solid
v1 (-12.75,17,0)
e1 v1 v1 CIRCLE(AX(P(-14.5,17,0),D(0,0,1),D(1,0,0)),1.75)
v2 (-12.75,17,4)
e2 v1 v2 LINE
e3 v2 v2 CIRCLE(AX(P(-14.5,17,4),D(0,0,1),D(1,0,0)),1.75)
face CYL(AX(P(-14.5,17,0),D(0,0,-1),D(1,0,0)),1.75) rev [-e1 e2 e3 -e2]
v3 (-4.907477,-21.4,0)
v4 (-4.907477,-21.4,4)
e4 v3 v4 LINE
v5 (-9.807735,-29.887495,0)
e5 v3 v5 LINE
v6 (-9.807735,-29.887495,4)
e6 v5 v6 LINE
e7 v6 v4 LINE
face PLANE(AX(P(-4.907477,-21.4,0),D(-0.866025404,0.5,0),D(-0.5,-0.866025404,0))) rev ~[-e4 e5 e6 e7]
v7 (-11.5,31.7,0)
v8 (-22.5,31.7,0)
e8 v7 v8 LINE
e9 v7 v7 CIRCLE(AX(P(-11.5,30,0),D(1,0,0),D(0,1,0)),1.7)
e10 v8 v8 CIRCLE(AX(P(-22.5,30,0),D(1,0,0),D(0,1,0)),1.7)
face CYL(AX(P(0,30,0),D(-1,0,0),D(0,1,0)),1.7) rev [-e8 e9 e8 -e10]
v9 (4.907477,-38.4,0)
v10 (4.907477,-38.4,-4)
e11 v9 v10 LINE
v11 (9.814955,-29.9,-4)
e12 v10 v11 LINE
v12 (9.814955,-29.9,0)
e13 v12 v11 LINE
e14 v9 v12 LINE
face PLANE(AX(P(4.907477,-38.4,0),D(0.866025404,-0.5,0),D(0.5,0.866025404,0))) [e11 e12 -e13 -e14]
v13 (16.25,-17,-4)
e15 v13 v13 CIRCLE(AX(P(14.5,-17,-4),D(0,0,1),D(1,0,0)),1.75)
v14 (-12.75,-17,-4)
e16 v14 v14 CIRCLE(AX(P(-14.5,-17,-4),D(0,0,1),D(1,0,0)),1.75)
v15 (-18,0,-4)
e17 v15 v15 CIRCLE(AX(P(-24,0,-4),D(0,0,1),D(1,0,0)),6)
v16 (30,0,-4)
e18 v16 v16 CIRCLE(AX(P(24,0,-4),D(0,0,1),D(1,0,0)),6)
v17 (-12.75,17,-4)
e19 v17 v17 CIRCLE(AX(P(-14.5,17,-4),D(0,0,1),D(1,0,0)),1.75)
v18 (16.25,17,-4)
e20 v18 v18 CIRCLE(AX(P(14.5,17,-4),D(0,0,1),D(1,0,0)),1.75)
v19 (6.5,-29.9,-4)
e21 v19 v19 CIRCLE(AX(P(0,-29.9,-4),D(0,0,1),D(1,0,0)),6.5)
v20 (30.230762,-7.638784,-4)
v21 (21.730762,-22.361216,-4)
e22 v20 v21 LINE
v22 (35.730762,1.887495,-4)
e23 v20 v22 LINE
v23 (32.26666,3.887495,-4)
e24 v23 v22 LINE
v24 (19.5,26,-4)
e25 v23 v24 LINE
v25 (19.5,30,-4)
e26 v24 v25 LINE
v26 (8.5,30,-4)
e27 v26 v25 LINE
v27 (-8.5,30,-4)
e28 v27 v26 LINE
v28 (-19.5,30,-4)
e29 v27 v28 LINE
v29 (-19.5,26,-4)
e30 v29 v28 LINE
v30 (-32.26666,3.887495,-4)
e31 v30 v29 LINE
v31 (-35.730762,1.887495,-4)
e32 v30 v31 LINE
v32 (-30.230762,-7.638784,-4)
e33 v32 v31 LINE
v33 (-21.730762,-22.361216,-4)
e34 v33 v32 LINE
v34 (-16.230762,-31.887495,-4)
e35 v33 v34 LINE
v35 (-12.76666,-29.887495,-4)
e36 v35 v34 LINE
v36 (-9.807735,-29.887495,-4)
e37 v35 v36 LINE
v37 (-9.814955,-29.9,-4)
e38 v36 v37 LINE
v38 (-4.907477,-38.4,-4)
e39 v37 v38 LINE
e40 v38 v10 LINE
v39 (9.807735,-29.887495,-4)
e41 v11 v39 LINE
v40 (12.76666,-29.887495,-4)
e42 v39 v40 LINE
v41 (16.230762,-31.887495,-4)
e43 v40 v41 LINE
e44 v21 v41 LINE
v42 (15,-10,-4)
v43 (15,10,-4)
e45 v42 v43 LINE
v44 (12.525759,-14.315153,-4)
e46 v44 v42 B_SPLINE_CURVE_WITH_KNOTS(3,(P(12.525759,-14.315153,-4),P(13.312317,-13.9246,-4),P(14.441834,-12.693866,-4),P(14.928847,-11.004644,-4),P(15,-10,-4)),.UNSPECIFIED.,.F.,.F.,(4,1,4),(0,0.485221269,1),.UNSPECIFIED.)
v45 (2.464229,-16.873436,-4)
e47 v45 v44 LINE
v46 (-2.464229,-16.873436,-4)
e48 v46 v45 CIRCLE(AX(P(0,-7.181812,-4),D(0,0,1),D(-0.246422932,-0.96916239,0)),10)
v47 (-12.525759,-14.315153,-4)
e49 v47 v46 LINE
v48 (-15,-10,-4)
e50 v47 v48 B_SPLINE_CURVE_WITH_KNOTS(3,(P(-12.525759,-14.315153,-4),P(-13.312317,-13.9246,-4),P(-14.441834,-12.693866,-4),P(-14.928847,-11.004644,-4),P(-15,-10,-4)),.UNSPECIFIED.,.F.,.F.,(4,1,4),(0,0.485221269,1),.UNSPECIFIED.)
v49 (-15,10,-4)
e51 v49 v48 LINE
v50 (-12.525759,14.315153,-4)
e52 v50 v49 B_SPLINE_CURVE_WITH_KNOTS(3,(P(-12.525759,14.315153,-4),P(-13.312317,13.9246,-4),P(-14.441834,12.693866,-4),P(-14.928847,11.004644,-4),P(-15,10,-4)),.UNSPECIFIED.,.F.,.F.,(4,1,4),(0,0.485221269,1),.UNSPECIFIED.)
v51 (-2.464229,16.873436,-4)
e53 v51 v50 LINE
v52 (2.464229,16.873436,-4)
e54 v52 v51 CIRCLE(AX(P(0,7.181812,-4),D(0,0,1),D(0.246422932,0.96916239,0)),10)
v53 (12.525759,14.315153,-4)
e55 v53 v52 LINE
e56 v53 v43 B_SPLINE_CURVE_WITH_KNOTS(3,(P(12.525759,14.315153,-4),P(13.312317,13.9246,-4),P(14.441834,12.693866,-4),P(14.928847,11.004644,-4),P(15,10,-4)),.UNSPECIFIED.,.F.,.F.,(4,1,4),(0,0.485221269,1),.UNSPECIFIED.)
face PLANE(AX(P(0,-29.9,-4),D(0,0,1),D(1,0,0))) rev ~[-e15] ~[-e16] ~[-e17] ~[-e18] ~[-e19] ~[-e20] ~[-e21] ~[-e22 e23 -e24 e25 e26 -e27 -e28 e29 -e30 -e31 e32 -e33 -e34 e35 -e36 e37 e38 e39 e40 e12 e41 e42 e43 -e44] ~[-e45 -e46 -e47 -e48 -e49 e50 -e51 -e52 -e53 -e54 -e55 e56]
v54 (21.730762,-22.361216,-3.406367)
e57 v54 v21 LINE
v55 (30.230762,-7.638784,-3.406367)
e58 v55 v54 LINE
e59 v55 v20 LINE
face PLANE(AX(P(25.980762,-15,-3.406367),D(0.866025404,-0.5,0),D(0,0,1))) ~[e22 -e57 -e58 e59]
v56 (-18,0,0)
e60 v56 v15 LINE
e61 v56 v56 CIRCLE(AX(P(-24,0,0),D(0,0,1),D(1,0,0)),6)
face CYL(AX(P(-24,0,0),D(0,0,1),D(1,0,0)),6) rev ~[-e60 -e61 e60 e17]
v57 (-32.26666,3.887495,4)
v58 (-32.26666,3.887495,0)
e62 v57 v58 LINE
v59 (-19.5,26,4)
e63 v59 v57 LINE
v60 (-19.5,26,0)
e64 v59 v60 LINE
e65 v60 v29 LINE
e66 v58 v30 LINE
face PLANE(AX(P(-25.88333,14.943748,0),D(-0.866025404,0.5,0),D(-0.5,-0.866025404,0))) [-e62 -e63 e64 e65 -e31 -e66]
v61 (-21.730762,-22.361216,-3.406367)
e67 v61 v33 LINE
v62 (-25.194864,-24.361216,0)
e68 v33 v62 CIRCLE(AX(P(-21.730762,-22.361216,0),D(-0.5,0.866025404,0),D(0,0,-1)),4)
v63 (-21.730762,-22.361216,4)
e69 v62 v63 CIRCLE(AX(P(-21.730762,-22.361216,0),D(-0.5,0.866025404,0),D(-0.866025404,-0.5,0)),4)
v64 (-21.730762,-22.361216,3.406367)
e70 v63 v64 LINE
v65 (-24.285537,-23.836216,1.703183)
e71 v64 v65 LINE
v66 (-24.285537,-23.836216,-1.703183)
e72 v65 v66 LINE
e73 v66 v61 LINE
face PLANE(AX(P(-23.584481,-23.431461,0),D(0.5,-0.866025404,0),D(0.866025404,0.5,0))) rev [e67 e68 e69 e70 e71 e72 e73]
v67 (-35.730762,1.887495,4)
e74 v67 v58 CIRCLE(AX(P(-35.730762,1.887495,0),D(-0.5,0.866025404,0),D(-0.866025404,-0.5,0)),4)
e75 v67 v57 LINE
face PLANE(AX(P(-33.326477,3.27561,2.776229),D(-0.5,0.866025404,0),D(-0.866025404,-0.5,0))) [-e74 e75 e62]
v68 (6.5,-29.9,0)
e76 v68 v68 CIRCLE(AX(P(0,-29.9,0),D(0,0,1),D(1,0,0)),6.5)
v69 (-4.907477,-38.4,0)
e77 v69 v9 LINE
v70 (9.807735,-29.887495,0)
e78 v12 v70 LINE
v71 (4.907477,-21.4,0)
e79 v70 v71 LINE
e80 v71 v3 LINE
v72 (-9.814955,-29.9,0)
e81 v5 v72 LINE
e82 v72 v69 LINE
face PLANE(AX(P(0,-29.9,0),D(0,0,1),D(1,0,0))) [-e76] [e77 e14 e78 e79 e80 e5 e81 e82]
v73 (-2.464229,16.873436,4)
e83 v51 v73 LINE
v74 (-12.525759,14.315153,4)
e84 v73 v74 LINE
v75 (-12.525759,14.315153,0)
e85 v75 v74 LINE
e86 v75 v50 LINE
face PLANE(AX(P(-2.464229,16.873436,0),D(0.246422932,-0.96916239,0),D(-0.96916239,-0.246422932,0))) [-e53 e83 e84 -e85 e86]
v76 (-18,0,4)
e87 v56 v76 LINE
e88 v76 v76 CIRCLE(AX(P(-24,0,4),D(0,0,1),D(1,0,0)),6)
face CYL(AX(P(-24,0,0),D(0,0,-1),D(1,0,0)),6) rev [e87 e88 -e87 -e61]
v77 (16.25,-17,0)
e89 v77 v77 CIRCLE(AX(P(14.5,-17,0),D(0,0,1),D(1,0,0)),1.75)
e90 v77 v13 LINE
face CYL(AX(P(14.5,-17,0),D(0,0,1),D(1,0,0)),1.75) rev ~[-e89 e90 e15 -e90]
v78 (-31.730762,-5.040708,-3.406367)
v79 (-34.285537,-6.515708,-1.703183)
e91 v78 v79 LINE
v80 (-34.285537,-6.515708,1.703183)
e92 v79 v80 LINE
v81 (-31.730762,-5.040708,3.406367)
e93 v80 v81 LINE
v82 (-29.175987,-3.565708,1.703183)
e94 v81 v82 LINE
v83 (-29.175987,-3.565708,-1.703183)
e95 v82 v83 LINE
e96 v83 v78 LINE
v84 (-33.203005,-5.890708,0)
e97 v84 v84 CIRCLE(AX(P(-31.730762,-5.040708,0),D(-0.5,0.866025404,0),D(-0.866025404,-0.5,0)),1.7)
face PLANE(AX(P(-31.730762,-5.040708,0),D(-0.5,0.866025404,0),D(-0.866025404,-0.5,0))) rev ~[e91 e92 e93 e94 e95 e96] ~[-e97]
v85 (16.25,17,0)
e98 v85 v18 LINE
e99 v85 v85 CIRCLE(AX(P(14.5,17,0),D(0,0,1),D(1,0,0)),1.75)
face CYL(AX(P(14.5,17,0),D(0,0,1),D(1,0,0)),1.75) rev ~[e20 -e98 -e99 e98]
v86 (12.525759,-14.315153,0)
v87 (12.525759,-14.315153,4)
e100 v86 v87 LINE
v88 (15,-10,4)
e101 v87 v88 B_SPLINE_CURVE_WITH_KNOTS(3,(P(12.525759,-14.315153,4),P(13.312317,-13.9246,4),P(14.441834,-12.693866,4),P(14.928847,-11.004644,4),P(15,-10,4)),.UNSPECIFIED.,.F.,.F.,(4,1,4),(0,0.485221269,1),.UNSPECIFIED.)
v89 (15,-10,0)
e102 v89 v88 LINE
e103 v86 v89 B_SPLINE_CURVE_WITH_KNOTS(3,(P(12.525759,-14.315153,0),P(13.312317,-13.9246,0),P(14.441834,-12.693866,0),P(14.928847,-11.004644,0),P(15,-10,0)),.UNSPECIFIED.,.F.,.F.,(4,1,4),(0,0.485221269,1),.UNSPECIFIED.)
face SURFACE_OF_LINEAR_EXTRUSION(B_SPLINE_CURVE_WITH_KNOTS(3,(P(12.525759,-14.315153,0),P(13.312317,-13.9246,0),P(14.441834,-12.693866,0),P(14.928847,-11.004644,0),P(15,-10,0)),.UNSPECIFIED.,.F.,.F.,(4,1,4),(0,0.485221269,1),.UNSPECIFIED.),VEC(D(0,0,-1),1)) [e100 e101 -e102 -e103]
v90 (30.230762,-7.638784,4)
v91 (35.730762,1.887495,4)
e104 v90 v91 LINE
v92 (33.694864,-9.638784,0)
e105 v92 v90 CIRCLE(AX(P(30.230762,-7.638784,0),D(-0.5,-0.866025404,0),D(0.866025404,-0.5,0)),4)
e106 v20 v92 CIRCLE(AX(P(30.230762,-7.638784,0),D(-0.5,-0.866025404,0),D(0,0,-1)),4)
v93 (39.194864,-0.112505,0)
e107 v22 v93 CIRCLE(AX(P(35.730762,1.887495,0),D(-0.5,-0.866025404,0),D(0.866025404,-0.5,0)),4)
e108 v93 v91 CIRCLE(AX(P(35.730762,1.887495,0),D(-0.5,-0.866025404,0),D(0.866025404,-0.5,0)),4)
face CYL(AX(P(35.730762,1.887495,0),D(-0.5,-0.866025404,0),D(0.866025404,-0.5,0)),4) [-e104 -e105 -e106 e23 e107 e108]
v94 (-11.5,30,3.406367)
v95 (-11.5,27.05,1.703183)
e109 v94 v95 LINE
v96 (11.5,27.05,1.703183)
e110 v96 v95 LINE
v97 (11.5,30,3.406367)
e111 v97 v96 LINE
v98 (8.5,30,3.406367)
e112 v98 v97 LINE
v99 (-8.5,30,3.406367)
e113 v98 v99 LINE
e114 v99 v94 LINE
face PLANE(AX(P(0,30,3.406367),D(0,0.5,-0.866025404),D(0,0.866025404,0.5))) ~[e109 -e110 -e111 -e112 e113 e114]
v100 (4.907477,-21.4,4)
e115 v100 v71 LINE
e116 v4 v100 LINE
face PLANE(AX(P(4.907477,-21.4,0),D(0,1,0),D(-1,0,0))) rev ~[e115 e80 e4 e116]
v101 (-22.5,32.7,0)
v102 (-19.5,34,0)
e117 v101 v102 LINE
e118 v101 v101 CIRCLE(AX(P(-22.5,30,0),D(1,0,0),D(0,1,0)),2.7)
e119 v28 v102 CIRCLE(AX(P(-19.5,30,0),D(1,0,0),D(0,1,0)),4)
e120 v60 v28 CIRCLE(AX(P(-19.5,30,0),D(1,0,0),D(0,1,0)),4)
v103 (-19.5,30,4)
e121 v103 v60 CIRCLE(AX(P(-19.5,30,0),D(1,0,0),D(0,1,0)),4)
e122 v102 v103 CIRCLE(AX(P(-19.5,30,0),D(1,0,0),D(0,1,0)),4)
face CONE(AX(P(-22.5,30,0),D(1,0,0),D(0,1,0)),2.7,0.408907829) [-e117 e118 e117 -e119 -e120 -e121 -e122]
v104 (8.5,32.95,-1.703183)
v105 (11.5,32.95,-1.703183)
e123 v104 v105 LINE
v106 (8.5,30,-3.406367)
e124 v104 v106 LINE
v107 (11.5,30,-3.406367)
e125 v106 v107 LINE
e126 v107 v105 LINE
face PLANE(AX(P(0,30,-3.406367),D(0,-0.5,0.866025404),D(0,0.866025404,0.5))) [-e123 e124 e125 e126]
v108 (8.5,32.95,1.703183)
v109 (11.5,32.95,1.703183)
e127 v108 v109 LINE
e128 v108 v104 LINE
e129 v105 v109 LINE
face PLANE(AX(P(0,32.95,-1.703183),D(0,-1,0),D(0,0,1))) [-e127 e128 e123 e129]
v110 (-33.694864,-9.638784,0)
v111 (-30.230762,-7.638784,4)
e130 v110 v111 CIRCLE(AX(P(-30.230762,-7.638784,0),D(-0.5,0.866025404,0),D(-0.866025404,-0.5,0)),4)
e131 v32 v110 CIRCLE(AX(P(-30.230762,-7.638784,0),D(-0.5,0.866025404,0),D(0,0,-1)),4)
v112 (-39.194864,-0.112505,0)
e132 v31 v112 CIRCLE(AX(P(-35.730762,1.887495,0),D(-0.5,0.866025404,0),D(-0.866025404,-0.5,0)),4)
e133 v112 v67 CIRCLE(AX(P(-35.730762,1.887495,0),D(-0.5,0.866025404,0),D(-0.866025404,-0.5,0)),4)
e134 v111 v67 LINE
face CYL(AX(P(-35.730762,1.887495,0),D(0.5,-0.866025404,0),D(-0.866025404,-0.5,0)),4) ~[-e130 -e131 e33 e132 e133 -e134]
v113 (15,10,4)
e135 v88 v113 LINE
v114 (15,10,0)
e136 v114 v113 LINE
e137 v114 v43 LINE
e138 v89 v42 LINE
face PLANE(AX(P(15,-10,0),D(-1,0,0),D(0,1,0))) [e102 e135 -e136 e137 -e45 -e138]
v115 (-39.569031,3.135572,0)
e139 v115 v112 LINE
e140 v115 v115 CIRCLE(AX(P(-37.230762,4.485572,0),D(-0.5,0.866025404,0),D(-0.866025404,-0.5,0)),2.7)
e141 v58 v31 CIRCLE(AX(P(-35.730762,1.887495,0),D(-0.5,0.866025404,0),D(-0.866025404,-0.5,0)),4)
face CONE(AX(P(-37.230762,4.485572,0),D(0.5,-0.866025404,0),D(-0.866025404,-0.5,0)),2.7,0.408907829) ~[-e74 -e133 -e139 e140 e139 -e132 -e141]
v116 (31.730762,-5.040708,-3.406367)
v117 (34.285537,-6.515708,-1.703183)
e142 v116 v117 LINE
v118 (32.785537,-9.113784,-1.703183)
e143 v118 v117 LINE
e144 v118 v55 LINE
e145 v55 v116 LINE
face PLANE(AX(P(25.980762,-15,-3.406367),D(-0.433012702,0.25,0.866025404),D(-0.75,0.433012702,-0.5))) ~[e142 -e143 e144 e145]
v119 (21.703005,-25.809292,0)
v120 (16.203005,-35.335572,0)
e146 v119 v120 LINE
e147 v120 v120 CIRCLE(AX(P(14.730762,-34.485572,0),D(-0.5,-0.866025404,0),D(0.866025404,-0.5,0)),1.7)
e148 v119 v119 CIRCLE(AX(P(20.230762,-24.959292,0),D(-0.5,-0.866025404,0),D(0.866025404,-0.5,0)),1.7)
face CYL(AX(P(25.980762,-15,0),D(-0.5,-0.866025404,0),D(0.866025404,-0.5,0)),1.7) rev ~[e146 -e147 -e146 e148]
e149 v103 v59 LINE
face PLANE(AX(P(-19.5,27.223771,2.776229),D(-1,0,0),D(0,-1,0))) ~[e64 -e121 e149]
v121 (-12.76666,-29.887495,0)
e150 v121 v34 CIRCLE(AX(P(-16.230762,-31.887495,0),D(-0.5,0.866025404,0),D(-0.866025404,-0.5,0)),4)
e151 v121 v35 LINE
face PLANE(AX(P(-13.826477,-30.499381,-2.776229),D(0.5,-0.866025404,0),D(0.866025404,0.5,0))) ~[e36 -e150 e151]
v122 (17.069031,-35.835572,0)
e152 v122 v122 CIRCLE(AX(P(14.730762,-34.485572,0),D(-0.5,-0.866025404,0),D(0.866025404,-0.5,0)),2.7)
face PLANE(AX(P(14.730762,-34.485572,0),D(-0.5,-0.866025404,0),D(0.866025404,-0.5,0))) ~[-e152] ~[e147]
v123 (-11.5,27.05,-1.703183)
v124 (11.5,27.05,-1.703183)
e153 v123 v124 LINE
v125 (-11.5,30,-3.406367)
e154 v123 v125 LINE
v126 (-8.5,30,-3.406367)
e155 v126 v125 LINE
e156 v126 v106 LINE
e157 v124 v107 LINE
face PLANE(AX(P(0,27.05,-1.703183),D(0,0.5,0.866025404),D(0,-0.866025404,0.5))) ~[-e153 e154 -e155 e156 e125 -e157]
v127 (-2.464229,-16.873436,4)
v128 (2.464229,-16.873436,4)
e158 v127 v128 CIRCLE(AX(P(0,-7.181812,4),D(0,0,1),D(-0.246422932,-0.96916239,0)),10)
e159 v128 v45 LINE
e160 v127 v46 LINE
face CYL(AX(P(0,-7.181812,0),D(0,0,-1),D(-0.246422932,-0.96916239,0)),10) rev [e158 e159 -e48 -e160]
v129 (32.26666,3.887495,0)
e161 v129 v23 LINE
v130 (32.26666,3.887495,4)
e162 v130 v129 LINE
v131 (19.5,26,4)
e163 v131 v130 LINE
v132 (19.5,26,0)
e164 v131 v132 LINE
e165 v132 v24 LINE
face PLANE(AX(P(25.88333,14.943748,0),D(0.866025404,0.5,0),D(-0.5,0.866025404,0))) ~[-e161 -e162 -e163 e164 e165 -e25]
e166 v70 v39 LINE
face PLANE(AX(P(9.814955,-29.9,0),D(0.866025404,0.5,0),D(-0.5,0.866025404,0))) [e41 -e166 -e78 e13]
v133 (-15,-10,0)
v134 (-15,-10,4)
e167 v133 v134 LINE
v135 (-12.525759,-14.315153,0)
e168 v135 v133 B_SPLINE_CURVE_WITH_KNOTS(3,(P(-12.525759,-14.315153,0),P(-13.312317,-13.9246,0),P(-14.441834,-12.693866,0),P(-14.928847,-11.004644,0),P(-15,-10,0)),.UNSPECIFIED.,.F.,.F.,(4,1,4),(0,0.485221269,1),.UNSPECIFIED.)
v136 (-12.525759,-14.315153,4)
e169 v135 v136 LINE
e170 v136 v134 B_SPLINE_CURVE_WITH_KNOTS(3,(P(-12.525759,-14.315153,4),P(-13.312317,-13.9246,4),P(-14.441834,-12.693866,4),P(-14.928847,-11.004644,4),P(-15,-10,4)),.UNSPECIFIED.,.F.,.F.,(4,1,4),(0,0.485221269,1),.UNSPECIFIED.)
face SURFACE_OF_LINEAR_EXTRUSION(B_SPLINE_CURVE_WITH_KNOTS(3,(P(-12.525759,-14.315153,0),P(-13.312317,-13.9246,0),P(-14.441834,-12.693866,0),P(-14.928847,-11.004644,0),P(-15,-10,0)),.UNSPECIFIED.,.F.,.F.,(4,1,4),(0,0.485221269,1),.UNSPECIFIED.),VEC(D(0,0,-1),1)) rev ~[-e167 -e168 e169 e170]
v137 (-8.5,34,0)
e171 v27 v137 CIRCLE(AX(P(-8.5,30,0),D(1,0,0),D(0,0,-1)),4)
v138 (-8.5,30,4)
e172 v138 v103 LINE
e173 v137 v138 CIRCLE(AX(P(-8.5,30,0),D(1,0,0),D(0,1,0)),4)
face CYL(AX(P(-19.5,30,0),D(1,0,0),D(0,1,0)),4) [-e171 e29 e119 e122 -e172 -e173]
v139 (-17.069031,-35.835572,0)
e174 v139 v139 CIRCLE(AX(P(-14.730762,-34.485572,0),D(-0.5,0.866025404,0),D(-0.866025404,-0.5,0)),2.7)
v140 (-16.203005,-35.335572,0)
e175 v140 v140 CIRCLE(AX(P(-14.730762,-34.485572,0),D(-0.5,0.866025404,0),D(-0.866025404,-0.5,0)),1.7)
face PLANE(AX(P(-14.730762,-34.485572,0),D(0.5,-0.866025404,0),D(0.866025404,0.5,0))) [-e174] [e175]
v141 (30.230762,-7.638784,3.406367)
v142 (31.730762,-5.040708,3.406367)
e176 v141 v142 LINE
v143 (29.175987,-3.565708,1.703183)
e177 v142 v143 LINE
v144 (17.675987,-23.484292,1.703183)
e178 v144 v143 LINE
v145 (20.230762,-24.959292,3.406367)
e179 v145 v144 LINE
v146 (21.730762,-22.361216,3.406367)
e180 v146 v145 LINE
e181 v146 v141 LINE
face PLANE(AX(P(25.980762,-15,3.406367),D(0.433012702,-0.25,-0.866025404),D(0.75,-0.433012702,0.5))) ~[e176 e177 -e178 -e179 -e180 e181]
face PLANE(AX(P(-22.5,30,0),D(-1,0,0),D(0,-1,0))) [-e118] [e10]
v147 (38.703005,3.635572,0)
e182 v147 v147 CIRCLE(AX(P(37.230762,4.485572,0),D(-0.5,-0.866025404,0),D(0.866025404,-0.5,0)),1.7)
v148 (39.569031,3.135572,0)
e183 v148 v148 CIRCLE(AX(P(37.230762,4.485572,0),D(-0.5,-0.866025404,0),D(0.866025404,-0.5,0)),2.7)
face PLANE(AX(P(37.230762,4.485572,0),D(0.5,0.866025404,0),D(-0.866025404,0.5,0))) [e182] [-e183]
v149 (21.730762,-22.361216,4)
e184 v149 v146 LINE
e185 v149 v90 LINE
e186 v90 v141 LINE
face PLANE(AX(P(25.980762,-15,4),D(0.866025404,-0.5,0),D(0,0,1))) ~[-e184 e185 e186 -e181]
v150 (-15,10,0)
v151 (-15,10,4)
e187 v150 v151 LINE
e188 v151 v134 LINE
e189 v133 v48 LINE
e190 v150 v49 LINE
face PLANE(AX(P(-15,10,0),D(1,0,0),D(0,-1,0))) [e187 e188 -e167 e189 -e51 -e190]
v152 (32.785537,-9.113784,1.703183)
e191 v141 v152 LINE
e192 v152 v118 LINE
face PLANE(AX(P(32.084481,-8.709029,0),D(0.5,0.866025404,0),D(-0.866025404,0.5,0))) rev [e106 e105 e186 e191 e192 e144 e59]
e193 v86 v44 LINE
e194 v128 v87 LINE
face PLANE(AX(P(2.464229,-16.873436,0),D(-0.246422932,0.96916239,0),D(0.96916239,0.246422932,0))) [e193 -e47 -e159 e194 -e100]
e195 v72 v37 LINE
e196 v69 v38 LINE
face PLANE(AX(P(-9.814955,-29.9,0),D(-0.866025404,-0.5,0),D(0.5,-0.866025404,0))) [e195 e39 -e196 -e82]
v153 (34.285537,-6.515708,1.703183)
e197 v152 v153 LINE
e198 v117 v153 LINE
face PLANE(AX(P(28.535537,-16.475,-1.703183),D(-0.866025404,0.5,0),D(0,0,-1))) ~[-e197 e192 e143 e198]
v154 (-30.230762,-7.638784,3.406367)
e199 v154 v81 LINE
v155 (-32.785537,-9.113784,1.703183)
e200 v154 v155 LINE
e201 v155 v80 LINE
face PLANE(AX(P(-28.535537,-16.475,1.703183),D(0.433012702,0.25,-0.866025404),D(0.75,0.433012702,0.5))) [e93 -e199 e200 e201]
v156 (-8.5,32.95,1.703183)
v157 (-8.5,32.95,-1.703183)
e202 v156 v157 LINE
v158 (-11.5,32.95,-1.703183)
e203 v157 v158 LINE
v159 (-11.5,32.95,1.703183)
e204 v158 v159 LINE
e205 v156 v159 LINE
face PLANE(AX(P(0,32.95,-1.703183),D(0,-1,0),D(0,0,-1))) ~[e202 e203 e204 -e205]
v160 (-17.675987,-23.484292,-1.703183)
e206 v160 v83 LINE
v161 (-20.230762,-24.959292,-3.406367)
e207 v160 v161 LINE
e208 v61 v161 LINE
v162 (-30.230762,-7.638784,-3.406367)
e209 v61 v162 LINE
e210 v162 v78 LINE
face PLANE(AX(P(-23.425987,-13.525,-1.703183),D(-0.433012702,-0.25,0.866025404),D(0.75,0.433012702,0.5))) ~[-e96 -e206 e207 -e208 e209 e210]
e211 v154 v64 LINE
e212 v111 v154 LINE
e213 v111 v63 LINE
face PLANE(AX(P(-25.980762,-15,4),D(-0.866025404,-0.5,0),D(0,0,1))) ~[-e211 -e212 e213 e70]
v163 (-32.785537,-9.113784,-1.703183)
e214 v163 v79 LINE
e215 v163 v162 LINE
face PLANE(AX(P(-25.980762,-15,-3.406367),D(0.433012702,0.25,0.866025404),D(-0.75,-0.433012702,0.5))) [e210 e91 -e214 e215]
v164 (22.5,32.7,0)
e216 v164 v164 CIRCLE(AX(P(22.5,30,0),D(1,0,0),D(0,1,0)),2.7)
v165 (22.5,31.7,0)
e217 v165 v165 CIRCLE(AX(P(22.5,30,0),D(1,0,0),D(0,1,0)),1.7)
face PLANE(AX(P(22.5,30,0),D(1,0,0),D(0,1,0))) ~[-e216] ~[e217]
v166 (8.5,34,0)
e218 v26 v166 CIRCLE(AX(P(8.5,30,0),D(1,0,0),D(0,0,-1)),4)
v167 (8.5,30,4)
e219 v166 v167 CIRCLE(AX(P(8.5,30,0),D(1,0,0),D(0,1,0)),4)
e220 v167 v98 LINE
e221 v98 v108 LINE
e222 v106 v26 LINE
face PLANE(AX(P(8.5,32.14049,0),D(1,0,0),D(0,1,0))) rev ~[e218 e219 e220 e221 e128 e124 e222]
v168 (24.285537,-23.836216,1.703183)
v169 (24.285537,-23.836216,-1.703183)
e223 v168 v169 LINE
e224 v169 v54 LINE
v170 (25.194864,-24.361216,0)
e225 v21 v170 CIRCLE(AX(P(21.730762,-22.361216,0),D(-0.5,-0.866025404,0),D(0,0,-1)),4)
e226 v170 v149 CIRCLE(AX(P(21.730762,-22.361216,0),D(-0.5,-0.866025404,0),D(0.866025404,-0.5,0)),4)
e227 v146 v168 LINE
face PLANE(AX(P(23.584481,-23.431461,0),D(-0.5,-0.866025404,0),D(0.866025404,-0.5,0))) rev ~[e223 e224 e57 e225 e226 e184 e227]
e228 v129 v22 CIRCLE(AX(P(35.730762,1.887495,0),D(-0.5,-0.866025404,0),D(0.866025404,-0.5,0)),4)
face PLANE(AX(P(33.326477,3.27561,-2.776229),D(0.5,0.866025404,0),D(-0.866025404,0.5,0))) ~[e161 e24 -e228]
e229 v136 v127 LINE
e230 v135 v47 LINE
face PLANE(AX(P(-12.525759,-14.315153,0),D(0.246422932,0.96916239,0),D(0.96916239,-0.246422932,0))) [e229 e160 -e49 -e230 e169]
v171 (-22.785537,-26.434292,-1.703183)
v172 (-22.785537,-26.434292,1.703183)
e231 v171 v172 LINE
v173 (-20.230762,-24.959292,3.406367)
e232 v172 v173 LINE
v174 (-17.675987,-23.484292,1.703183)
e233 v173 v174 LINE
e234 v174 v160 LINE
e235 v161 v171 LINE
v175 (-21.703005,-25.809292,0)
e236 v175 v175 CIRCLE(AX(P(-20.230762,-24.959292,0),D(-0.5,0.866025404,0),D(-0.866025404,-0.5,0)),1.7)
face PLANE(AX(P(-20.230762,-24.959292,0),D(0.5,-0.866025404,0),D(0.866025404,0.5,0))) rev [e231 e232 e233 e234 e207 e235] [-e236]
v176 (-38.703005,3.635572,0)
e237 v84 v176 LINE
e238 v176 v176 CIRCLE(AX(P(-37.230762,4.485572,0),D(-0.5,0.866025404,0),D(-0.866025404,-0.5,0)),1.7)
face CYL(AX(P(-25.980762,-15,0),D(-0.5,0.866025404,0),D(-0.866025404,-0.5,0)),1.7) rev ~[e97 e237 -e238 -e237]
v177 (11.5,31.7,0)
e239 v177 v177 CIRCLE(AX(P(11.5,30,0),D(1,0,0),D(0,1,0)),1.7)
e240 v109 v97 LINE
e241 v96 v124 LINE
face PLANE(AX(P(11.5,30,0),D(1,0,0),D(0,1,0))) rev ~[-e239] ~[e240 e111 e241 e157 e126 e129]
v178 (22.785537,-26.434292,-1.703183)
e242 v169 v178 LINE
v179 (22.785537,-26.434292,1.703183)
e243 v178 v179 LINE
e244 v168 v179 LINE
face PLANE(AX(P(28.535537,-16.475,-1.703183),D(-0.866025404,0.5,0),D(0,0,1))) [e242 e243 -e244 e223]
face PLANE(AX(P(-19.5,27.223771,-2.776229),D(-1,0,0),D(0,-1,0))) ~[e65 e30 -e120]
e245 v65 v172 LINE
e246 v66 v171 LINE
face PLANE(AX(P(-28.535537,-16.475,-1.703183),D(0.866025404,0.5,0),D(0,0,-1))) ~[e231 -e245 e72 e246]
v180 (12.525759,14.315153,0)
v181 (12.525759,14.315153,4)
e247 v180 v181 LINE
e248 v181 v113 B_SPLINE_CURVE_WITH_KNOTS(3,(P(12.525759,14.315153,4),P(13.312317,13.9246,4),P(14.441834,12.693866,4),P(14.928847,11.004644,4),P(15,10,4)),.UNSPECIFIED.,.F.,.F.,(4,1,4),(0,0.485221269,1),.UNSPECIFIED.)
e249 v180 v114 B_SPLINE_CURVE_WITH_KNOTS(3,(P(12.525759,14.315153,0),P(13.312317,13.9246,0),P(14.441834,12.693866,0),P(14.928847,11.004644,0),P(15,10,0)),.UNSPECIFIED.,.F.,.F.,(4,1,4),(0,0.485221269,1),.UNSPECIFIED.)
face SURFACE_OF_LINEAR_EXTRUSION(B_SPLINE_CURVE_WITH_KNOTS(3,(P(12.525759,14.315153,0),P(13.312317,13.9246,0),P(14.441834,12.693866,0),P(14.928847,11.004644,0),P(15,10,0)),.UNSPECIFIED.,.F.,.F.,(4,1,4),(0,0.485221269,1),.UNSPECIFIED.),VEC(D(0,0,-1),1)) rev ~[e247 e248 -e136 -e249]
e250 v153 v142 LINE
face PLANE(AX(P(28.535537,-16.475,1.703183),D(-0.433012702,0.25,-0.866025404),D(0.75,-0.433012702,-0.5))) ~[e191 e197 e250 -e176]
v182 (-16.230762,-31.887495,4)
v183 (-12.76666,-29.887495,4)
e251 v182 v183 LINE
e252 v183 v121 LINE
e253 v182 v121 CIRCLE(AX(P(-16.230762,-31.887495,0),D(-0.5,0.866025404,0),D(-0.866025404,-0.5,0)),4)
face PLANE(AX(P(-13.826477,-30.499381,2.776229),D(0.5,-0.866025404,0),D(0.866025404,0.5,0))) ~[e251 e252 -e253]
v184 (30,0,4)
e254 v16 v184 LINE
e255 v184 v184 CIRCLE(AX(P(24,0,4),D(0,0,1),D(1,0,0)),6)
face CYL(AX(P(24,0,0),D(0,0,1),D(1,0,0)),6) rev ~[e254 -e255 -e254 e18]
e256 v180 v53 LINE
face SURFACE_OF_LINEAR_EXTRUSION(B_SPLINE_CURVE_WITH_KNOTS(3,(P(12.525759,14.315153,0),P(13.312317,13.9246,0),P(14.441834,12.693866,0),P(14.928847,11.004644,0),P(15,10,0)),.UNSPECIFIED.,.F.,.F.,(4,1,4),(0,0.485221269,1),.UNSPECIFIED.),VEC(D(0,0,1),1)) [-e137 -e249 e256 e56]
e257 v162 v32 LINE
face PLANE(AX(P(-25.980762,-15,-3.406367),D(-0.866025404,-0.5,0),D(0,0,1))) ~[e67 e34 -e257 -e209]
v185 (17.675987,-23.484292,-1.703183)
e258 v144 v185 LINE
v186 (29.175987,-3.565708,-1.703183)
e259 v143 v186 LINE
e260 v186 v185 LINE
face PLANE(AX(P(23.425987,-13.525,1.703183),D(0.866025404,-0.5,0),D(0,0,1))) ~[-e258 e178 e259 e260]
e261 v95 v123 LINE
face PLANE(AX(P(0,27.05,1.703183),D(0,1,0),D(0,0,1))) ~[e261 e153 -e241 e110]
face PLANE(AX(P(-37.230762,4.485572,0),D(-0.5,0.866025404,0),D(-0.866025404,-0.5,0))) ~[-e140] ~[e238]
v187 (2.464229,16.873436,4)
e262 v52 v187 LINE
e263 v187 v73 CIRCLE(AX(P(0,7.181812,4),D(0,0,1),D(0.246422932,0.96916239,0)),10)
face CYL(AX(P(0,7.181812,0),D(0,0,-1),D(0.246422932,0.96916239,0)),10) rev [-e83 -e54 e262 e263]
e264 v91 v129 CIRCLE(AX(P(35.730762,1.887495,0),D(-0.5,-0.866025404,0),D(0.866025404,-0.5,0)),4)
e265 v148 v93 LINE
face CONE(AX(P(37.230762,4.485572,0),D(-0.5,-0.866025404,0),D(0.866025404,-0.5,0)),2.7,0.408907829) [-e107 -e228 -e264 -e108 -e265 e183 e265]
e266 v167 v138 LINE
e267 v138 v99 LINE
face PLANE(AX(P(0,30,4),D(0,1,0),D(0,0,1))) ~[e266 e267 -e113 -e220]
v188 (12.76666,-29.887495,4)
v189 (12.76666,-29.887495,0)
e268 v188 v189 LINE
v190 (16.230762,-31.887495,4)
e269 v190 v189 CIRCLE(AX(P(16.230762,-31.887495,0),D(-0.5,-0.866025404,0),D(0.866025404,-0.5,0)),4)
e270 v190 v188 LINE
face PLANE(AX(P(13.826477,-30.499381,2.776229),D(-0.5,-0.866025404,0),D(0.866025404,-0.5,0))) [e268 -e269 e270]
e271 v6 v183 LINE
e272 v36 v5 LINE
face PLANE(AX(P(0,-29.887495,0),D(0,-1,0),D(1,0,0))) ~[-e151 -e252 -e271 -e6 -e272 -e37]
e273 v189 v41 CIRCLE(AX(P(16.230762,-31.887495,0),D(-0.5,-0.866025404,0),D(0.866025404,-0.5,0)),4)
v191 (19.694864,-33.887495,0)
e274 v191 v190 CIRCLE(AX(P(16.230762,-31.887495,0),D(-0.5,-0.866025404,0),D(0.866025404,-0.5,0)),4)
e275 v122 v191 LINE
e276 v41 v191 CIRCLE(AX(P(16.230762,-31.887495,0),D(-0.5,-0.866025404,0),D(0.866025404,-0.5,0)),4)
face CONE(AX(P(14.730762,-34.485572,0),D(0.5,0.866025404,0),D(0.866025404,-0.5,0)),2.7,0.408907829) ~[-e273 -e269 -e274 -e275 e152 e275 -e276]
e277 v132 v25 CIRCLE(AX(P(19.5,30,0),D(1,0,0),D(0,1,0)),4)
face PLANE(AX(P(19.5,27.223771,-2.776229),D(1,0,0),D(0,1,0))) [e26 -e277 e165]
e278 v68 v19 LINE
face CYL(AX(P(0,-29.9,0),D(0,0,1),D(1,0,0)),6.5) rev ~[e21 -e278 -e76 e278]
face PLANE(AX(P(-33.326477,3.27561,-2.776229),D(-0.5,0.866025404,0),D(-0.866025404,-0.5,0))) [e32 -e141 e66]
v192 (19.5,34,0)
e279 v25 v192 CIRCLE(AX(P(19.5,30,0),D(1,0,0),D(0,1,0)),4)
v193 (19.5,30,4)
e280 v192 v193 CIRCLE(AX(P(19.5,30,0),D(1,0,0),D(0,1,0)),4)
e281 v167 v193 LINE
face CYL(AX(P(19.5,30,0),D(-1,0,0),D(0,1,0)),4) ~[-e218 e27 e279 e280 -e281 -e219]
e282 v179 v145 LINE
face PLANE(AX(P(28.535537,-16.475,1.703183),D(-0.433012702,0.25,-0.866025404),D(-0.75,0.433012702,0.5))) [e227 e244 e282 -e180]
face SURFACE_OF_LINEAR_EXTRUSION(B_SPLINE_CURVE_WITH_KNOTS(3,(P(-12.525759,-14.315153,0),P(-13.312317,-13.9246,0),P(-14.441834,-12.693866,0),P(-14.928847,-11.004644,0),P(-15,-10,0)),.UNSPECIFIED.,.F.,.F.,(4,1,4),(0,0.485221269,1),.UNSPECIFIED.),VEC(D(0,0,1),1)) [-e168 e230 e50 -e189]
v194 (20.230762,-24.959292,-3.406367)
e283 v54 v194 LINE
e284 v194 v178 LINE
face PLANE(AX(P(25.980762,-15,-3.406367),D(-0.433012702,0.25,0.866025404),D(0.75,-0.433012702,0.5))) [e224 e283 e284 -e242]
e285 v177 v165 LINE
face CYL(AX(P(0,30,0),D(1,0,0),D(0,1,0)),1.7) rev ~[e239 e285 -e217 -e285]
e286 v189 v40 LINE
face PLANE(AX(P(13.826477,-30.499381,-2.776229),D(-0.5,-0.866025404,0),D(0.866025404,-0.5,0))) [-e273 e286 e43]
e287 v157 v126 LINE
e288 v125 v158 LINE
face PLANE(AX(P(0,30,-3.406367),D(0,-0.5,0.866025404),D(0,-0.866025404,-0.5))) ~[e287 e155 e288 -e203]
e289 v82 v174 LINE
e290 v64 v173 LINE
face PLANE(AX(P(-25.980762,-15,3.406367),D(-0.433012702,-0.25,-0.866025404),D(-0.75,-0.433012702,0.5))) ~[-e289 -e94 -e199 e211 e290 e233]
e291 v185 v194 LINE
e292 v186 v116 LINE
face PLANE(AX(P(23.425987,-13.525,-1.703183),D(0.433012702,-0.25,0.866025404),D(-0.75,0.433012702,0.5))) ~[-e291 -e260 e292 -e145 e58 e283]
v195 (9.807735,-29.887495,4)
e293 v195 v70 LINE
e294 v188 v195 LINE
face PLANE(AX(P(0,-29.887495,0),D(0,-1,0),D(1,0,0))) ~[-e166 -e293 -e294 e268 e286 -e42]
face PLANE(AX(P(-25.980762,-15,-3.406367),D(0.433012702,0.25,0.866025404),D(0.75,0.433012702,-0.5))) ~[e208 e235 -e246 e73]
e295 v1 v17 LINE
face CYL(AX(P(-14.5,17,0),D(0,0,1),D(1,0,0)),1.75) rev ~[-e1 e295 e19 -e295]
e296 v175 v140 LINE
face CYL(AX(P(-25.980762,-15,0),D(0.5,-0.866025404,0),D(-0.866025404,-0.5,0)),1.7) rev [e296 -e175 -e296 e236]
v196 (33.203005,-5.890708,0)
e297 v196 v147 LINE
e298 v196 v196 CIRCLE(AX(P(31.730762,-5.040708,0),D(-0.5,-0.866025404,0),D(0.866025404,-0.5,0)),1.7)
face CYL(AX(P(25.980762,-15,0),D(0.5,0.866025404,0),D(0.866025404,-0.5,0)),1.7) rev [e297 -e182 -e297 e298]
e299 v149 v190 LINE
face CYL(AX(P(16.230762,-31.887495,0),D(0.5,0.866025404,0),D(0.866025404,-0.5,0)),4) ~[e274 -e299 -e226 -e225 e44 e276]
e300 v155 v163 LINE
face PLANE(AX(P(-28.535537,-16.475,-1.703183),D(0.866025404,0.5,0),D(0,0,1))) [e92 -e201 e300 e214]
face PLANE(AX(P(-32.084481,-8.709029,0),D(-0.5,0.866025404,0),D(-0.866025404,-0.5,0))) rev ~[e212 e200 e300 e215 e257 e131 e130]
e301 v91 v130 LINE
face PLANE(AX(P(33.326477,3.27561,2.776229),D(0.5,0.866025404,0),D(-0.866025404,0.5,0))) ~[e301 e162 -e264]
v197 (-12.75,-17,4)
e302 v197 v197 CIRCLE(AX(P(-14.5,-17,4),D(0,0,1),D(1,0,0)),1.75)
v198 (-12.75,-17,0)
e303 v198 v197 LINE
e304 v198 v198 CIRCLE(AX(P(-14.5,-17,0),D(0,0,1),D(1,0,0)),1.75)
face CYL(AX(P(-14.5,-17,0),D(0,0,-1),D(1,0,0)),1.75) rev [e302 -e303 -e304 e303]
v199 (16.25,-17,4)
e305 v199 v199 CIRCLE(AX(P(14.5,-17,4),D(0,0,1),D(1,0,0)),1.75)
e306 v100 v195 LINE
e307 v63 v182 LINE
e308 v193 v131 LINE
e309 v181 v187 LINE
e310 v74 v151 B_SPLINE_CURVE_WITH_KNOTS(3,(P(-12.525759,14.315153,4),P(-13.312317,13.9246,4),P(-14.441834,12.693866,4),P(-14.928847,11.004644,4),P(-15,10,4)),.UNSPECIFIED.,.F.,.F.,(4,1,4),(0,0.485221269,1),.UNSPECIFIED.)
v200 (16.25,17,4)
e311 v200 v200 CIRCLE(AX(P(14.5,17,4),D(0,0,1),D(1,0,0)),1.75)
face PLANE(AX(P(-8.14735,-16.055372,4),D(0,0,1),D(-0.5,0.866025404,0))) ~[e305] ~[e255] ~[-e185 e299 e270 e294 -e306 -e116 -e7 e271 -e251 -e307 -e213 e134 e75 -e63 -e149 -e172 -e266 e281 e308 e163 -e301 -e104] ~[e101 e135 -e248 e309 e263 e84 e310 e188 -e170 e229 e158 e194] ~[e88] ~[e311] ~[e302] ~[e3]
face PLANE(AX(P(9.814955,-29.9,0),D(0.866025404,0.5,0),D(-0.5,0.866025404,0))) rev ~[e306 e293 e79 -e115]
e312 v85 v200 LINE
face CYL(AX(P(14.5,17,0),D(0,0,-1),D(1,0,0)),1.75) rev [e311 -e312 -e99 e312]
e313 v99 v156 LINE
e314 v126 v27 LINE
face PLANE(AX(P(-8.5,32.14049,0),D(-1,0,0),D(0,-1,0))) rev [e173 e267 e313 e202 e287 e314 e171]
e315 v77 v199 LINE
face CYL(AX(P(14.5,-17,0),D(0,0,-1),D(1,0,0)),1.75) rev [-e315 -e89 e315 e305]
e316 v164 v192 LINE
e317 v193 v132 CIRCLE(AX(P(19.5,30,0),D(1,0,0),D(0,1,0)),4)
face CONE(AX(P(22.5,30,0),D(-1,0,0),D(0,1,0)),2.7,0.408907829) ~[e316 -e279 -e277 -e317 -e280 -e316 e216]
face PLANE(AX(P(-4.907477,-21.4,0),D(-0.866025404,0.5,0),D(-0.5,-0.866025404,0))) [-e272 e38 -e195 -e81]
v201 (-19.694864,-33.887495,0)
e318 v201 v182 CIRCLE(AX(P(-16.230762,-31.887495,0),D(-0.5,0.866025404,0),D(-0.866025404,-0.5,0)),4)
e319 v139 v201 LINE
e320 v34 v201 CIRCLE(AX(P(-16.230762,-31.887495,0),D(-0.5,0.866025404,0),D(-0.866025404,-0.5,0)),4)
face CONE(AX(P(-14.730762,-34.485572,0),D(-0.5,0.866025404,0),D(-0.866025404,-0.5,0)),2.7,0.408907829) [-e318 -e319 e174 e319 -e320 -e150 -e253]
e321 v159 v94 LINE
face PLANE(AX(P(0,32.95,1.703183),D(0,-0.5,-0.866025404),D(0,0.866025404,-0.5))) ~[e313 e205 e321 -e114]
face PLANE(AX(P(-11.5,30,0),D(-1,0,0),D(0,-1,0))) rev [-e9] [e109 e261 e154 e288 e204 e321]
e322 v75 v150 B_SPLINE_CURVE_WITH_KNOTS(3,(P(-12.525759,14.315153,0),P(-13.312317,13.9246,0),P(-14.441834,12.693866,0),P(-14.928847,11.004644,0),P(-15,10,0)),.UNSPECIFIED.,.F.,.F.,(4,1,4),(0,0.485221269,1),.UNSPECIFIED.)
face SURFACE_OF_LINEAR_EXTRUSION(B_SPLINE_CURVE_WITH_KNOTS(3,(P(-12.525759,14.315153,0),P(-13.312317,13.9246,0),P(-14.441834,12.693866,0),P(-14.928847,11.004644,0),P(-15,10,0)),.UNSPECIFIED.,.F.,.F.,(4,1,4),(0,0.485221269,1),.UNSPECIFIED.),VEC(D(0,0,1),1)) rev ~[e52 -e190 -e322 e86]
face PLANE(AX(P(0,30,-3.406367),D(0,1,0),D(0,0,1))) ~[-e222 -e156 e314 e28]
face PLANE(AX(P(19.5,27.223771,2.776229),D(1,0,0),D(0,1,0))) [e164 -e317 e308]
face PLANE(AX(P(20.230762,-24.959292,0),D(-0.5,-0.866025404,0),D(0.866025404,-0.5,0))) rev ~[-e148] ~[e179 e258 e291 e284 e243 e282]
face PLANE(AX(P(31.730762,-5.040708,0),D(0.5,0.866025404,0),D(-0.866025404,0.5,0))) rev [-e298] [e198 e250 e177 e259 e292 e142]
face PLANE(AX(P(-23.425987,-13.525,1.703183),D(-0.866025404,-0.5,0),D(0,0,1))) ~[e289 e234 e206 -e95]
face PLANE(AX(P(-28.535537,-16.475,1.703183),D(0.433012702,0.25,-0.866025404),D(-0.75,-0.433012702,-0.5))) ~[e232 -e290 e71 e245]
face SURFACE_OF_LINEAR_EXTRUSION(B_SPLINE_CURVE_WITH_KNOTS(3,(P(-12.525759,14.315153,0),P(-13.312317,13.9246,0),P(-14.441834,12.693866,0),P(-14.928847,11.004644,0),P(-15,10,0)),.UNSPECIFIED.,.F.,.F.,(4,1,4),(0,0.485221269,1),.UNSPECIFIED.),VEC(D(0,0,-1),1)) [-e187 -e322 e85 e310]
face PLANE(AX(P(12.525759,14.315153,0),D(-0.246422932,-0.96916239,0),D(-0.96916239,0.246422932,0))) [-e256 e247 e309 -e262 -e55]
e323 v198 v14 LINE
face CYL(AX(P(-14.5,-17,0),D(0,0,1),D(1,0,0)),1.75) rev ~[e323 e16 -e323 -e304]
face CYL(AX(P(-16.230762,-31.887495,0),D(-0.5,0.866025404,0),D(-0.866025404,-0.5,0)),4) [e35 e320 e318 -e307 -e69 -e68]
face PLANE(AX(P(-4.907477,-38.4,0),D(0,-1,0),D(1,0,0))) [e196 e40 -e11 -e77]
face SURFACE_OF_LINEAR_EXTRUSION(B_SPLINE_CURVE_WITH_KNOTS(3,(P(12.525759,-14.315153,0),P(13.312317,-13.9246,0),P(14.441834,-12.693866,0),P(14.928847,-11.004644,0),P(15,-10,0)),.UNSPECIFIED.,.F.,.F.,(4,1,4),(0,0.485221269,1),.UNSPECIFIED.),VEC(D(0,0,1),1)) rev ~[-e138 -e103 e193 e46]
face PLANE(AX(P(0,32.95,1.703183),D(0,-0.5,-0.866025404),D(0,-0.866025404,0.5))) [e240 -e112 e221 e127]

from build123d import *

# Parameters (mm, degrees)
F4_DEPTH  = 19.5
F5_DEPTH  = 4
F6_DEPTH  = 11.5
F7_DEPTH  = 8.5
F9_COUNT  = 3
F9_ANGLE  = 240
F2_R      = 1.75
F2_R_2    = 6
F10_DEPTH = 4
F11_R     = 6.5
F12_DEPTH = 20
F13_DEPTH = 4


# Not quite as in the source:
# - a feature of the source that left no trace in its solid (it failed there, or was rolled back) is left out
# - a feature names something its author has since deleted; it is built from what else it names


with BuildPart() as f3:
    # F0 (on Top) → F3 (revolve)
    with BuildSketch(Plane.XY):
        Polygon((19.5, 34), (0, 34), (0, 31.7), (22.5, 31.7), (22.5, 32.7), align=None)
    revolve(axis=Axis((11.25, 30, 0), (1, 0, 0)))

    # F1 (on Right) → F4 (join)
    with BuildSketch(Plane.YZ):
        with BuildLine():
            Line((26, 4), (26, 0))
            ThreePointArc((26, 0), (27.1715728753, 2.8284271247), (30, 4))
            Line((30, 4), (26, 4))
        make_face()
        with BuildLine():
            Line((26, -4), (30, -4))
            ThreePointArc((30, -4), (27.1715728753, -2.8284271247), (26, 0))
            Line((26, 0), (26, -4))
        make_face()
    extrude(amount=F4_DEPTH)

    # F0 (on Top) → F5 (join, symmetric)
    with BuildSketch(Plane.XY):
        Polygon((19.5, 26), (0, 26), (0, 0), (25.8833302492, 14.9437476869), align=None)
    extrude(amount=F5_DEPTH, both=True)

    # F1 (on Right) → F6 (cut)
    with BuildSketch(Plane.YZ):
        Polygon((30, -3.4063665882), (32.95, -1.7031832941), (32.95, 1.7031832941), (30, 3.4063665882), (27.05, 1.7031832941), (27.05, -1.7031832941), align=None)
    extrude(amount=F6_DEPTH, mode=Mode.SUBTRACT)

    # F1 (on Right) → F7 (cut)
    with BuildSketch(Plane.YZ):
        with BuildLine():
            Line((32.95, 1.7031832941), (32.95, -1.7031832941))
            Line((32.95, -1.7031832941), (30, -3.4063665882))
            Line((30, -3.4063665882), (30, -4))
            ThreePointArc((30, -4), (32.8284271247, -2.8284271247), (34, 0))
            ThreePointArc((34, 0), (32.8284271247, 2.8284271247), (30, 4))
            Line((30, 4), (30, 3.4063665882))
            Line((30, 3.4063665882), (32.95, 1.7031832941))
        make_face()
    extrude(amount=F7_DEPTH, mode=Mode.SUBTRACT)

    # F8: F3 across plane


with BuildPart() as f3_1:
    add(f3.part)
    add(f3.part.mirror(Plane.YZ))

    # F9: F3 ×3 about axis
    f9_axis = Axis((0, 0, 0), (0, 0, -1))


with BuildPart() as f3_2:
    add(f3_1.part)
    for i in range(1, F9_COUNT):
        add(f3_1.part.rotate(f9_axis, i * F9_ANGLE / (F9_COUNT - 1)))

    # F2 (on Top) → F10 (cut, symmetric)
    with BuildSketch(Plane.XY):
        with Locations((14.5, 17)):
            Circle(F2_R)
        with BuildLine():
            add(Edge.make_bspline(
                [(12.5257586532, 14.3151527465), (13.3123168346, 13.9246002449), (14.4418337404, 12.6938657), (14.9288469383, 11.0046443666), (15, 10)],
                knots=[0, 0, 0, 0, 0.4852212686, 1, 1, 1, 1], degree=3))
            Line((12.5257586532, 14.3151527465), (2.4642293228, 16.8734356371))
            ThreePointArc((2.4642293228, 16.8734356371), (0, 17.1818117358), (-2.4642293228, 16.8734356371))
            Line((-2.4642293228, 16.8734356371), (-12.5257586532, 14.3151527465))
            add(Edge.make_bspline(
                [(-12.5257586532, 14.3151527465), (-13.3123168346, 13.9246002449), (-14.4418337404, 12.6938657), (-14.9288469383, 11.0046443666), (-15, 10)],
                knots=[0, 0, 0, 0, 0.4852212686, 1, 1, 1, 1], degree=3))
            Line((-15, 10), (-15, 0))
            Line((-15, 0), (-15, -10))
            add(Edge.make_bspline(
                [(-12.5257586532, -14.3151527465), (-13.3123168346, -13.9246002449), (-14.4418337404, -12.6938657), (-14.9288469383, -11.0046443666), (-15, -10)],
                knots=[0, 0, 0, 0, 0.4852212686, 1, 1, 1, 1], degree=3))
            Line((-12.5257586532, -14.3151527465), (-2.4642293228, -16.8734356371))
            ThreePointArc((-2.4642293228, -16.8734356371), (0, -17.1818117358), (2.4642293228, -16.8734356371))
            Line((2.4642293228, -16.8734356371), (12.5257586532, -14.3151527465))
            add(Edge.make_bspline(
                [(12.5257586532, -14.3151527465), (13.3123168346, -13.9246002449), (14.4418337404, -12.6938657), (14.9288469383, -11.0046443666), (15, -10)],
                knots=[0, 0, 0, 0, 0.4852212686, 1, 1, 1, 1], degree=3))
            Line((15, -10), (15, 0))
            Line((15, 0), (15, 10))
        make_face()
        with Locations((-14.5, 17)):
            Circle(F2_R)
        with Locations((-14.5, -17)):
            Circle(F2_R)
        with Locations((14.5, -17)):
            Circle(F2_R)
        with Locations((-24, 0)):
            Circle(F2_R_2)
        with Locations((24, 0)):
            Circle(F2_R_2)
    extrude(amount=F10_DEPTH, both=True, mode=Mode.SUBTRACT)

    # F11 (on Top) → F12 (cut, symmetric)
    with BuildSketch(Plane.XY):
        Polygon((4.9074772881, -21.4), (-4.9074772881, -21.4), (-9.8149545762, -29.9), (-4.9074772881, -38.4), (4.9074772881, -38.4), (9.8149545762, -29.9), align=None)
        with Locations((0, -29.9)):
            Circle(F11_R, mode=Mode.SUBTRACT)
        with Locations((0, -29.9)):
            Circle(F11_R)
    extrude(amount=F12_DEPTH, both=True, mode=Mode.SUBTRACT)

    # F11 (on Top) → F13 (join)
    with BuildSketch(Plane.XY):
        Polygon((4.9074772881, -21.4), (-4.9074772881, -21.4), (-9.8149545762, -29.9), (-4.9074772881, -38.4), (4.9074772881, -38.4), (9.8149545762, -29.9), align=None)
        with Locations((0, -29.9)):
            Circle(F11_R, mode=Mode.SUBTRACT)
    extrude(amount=-F13_DEPTH)


solid = f3_2.part
